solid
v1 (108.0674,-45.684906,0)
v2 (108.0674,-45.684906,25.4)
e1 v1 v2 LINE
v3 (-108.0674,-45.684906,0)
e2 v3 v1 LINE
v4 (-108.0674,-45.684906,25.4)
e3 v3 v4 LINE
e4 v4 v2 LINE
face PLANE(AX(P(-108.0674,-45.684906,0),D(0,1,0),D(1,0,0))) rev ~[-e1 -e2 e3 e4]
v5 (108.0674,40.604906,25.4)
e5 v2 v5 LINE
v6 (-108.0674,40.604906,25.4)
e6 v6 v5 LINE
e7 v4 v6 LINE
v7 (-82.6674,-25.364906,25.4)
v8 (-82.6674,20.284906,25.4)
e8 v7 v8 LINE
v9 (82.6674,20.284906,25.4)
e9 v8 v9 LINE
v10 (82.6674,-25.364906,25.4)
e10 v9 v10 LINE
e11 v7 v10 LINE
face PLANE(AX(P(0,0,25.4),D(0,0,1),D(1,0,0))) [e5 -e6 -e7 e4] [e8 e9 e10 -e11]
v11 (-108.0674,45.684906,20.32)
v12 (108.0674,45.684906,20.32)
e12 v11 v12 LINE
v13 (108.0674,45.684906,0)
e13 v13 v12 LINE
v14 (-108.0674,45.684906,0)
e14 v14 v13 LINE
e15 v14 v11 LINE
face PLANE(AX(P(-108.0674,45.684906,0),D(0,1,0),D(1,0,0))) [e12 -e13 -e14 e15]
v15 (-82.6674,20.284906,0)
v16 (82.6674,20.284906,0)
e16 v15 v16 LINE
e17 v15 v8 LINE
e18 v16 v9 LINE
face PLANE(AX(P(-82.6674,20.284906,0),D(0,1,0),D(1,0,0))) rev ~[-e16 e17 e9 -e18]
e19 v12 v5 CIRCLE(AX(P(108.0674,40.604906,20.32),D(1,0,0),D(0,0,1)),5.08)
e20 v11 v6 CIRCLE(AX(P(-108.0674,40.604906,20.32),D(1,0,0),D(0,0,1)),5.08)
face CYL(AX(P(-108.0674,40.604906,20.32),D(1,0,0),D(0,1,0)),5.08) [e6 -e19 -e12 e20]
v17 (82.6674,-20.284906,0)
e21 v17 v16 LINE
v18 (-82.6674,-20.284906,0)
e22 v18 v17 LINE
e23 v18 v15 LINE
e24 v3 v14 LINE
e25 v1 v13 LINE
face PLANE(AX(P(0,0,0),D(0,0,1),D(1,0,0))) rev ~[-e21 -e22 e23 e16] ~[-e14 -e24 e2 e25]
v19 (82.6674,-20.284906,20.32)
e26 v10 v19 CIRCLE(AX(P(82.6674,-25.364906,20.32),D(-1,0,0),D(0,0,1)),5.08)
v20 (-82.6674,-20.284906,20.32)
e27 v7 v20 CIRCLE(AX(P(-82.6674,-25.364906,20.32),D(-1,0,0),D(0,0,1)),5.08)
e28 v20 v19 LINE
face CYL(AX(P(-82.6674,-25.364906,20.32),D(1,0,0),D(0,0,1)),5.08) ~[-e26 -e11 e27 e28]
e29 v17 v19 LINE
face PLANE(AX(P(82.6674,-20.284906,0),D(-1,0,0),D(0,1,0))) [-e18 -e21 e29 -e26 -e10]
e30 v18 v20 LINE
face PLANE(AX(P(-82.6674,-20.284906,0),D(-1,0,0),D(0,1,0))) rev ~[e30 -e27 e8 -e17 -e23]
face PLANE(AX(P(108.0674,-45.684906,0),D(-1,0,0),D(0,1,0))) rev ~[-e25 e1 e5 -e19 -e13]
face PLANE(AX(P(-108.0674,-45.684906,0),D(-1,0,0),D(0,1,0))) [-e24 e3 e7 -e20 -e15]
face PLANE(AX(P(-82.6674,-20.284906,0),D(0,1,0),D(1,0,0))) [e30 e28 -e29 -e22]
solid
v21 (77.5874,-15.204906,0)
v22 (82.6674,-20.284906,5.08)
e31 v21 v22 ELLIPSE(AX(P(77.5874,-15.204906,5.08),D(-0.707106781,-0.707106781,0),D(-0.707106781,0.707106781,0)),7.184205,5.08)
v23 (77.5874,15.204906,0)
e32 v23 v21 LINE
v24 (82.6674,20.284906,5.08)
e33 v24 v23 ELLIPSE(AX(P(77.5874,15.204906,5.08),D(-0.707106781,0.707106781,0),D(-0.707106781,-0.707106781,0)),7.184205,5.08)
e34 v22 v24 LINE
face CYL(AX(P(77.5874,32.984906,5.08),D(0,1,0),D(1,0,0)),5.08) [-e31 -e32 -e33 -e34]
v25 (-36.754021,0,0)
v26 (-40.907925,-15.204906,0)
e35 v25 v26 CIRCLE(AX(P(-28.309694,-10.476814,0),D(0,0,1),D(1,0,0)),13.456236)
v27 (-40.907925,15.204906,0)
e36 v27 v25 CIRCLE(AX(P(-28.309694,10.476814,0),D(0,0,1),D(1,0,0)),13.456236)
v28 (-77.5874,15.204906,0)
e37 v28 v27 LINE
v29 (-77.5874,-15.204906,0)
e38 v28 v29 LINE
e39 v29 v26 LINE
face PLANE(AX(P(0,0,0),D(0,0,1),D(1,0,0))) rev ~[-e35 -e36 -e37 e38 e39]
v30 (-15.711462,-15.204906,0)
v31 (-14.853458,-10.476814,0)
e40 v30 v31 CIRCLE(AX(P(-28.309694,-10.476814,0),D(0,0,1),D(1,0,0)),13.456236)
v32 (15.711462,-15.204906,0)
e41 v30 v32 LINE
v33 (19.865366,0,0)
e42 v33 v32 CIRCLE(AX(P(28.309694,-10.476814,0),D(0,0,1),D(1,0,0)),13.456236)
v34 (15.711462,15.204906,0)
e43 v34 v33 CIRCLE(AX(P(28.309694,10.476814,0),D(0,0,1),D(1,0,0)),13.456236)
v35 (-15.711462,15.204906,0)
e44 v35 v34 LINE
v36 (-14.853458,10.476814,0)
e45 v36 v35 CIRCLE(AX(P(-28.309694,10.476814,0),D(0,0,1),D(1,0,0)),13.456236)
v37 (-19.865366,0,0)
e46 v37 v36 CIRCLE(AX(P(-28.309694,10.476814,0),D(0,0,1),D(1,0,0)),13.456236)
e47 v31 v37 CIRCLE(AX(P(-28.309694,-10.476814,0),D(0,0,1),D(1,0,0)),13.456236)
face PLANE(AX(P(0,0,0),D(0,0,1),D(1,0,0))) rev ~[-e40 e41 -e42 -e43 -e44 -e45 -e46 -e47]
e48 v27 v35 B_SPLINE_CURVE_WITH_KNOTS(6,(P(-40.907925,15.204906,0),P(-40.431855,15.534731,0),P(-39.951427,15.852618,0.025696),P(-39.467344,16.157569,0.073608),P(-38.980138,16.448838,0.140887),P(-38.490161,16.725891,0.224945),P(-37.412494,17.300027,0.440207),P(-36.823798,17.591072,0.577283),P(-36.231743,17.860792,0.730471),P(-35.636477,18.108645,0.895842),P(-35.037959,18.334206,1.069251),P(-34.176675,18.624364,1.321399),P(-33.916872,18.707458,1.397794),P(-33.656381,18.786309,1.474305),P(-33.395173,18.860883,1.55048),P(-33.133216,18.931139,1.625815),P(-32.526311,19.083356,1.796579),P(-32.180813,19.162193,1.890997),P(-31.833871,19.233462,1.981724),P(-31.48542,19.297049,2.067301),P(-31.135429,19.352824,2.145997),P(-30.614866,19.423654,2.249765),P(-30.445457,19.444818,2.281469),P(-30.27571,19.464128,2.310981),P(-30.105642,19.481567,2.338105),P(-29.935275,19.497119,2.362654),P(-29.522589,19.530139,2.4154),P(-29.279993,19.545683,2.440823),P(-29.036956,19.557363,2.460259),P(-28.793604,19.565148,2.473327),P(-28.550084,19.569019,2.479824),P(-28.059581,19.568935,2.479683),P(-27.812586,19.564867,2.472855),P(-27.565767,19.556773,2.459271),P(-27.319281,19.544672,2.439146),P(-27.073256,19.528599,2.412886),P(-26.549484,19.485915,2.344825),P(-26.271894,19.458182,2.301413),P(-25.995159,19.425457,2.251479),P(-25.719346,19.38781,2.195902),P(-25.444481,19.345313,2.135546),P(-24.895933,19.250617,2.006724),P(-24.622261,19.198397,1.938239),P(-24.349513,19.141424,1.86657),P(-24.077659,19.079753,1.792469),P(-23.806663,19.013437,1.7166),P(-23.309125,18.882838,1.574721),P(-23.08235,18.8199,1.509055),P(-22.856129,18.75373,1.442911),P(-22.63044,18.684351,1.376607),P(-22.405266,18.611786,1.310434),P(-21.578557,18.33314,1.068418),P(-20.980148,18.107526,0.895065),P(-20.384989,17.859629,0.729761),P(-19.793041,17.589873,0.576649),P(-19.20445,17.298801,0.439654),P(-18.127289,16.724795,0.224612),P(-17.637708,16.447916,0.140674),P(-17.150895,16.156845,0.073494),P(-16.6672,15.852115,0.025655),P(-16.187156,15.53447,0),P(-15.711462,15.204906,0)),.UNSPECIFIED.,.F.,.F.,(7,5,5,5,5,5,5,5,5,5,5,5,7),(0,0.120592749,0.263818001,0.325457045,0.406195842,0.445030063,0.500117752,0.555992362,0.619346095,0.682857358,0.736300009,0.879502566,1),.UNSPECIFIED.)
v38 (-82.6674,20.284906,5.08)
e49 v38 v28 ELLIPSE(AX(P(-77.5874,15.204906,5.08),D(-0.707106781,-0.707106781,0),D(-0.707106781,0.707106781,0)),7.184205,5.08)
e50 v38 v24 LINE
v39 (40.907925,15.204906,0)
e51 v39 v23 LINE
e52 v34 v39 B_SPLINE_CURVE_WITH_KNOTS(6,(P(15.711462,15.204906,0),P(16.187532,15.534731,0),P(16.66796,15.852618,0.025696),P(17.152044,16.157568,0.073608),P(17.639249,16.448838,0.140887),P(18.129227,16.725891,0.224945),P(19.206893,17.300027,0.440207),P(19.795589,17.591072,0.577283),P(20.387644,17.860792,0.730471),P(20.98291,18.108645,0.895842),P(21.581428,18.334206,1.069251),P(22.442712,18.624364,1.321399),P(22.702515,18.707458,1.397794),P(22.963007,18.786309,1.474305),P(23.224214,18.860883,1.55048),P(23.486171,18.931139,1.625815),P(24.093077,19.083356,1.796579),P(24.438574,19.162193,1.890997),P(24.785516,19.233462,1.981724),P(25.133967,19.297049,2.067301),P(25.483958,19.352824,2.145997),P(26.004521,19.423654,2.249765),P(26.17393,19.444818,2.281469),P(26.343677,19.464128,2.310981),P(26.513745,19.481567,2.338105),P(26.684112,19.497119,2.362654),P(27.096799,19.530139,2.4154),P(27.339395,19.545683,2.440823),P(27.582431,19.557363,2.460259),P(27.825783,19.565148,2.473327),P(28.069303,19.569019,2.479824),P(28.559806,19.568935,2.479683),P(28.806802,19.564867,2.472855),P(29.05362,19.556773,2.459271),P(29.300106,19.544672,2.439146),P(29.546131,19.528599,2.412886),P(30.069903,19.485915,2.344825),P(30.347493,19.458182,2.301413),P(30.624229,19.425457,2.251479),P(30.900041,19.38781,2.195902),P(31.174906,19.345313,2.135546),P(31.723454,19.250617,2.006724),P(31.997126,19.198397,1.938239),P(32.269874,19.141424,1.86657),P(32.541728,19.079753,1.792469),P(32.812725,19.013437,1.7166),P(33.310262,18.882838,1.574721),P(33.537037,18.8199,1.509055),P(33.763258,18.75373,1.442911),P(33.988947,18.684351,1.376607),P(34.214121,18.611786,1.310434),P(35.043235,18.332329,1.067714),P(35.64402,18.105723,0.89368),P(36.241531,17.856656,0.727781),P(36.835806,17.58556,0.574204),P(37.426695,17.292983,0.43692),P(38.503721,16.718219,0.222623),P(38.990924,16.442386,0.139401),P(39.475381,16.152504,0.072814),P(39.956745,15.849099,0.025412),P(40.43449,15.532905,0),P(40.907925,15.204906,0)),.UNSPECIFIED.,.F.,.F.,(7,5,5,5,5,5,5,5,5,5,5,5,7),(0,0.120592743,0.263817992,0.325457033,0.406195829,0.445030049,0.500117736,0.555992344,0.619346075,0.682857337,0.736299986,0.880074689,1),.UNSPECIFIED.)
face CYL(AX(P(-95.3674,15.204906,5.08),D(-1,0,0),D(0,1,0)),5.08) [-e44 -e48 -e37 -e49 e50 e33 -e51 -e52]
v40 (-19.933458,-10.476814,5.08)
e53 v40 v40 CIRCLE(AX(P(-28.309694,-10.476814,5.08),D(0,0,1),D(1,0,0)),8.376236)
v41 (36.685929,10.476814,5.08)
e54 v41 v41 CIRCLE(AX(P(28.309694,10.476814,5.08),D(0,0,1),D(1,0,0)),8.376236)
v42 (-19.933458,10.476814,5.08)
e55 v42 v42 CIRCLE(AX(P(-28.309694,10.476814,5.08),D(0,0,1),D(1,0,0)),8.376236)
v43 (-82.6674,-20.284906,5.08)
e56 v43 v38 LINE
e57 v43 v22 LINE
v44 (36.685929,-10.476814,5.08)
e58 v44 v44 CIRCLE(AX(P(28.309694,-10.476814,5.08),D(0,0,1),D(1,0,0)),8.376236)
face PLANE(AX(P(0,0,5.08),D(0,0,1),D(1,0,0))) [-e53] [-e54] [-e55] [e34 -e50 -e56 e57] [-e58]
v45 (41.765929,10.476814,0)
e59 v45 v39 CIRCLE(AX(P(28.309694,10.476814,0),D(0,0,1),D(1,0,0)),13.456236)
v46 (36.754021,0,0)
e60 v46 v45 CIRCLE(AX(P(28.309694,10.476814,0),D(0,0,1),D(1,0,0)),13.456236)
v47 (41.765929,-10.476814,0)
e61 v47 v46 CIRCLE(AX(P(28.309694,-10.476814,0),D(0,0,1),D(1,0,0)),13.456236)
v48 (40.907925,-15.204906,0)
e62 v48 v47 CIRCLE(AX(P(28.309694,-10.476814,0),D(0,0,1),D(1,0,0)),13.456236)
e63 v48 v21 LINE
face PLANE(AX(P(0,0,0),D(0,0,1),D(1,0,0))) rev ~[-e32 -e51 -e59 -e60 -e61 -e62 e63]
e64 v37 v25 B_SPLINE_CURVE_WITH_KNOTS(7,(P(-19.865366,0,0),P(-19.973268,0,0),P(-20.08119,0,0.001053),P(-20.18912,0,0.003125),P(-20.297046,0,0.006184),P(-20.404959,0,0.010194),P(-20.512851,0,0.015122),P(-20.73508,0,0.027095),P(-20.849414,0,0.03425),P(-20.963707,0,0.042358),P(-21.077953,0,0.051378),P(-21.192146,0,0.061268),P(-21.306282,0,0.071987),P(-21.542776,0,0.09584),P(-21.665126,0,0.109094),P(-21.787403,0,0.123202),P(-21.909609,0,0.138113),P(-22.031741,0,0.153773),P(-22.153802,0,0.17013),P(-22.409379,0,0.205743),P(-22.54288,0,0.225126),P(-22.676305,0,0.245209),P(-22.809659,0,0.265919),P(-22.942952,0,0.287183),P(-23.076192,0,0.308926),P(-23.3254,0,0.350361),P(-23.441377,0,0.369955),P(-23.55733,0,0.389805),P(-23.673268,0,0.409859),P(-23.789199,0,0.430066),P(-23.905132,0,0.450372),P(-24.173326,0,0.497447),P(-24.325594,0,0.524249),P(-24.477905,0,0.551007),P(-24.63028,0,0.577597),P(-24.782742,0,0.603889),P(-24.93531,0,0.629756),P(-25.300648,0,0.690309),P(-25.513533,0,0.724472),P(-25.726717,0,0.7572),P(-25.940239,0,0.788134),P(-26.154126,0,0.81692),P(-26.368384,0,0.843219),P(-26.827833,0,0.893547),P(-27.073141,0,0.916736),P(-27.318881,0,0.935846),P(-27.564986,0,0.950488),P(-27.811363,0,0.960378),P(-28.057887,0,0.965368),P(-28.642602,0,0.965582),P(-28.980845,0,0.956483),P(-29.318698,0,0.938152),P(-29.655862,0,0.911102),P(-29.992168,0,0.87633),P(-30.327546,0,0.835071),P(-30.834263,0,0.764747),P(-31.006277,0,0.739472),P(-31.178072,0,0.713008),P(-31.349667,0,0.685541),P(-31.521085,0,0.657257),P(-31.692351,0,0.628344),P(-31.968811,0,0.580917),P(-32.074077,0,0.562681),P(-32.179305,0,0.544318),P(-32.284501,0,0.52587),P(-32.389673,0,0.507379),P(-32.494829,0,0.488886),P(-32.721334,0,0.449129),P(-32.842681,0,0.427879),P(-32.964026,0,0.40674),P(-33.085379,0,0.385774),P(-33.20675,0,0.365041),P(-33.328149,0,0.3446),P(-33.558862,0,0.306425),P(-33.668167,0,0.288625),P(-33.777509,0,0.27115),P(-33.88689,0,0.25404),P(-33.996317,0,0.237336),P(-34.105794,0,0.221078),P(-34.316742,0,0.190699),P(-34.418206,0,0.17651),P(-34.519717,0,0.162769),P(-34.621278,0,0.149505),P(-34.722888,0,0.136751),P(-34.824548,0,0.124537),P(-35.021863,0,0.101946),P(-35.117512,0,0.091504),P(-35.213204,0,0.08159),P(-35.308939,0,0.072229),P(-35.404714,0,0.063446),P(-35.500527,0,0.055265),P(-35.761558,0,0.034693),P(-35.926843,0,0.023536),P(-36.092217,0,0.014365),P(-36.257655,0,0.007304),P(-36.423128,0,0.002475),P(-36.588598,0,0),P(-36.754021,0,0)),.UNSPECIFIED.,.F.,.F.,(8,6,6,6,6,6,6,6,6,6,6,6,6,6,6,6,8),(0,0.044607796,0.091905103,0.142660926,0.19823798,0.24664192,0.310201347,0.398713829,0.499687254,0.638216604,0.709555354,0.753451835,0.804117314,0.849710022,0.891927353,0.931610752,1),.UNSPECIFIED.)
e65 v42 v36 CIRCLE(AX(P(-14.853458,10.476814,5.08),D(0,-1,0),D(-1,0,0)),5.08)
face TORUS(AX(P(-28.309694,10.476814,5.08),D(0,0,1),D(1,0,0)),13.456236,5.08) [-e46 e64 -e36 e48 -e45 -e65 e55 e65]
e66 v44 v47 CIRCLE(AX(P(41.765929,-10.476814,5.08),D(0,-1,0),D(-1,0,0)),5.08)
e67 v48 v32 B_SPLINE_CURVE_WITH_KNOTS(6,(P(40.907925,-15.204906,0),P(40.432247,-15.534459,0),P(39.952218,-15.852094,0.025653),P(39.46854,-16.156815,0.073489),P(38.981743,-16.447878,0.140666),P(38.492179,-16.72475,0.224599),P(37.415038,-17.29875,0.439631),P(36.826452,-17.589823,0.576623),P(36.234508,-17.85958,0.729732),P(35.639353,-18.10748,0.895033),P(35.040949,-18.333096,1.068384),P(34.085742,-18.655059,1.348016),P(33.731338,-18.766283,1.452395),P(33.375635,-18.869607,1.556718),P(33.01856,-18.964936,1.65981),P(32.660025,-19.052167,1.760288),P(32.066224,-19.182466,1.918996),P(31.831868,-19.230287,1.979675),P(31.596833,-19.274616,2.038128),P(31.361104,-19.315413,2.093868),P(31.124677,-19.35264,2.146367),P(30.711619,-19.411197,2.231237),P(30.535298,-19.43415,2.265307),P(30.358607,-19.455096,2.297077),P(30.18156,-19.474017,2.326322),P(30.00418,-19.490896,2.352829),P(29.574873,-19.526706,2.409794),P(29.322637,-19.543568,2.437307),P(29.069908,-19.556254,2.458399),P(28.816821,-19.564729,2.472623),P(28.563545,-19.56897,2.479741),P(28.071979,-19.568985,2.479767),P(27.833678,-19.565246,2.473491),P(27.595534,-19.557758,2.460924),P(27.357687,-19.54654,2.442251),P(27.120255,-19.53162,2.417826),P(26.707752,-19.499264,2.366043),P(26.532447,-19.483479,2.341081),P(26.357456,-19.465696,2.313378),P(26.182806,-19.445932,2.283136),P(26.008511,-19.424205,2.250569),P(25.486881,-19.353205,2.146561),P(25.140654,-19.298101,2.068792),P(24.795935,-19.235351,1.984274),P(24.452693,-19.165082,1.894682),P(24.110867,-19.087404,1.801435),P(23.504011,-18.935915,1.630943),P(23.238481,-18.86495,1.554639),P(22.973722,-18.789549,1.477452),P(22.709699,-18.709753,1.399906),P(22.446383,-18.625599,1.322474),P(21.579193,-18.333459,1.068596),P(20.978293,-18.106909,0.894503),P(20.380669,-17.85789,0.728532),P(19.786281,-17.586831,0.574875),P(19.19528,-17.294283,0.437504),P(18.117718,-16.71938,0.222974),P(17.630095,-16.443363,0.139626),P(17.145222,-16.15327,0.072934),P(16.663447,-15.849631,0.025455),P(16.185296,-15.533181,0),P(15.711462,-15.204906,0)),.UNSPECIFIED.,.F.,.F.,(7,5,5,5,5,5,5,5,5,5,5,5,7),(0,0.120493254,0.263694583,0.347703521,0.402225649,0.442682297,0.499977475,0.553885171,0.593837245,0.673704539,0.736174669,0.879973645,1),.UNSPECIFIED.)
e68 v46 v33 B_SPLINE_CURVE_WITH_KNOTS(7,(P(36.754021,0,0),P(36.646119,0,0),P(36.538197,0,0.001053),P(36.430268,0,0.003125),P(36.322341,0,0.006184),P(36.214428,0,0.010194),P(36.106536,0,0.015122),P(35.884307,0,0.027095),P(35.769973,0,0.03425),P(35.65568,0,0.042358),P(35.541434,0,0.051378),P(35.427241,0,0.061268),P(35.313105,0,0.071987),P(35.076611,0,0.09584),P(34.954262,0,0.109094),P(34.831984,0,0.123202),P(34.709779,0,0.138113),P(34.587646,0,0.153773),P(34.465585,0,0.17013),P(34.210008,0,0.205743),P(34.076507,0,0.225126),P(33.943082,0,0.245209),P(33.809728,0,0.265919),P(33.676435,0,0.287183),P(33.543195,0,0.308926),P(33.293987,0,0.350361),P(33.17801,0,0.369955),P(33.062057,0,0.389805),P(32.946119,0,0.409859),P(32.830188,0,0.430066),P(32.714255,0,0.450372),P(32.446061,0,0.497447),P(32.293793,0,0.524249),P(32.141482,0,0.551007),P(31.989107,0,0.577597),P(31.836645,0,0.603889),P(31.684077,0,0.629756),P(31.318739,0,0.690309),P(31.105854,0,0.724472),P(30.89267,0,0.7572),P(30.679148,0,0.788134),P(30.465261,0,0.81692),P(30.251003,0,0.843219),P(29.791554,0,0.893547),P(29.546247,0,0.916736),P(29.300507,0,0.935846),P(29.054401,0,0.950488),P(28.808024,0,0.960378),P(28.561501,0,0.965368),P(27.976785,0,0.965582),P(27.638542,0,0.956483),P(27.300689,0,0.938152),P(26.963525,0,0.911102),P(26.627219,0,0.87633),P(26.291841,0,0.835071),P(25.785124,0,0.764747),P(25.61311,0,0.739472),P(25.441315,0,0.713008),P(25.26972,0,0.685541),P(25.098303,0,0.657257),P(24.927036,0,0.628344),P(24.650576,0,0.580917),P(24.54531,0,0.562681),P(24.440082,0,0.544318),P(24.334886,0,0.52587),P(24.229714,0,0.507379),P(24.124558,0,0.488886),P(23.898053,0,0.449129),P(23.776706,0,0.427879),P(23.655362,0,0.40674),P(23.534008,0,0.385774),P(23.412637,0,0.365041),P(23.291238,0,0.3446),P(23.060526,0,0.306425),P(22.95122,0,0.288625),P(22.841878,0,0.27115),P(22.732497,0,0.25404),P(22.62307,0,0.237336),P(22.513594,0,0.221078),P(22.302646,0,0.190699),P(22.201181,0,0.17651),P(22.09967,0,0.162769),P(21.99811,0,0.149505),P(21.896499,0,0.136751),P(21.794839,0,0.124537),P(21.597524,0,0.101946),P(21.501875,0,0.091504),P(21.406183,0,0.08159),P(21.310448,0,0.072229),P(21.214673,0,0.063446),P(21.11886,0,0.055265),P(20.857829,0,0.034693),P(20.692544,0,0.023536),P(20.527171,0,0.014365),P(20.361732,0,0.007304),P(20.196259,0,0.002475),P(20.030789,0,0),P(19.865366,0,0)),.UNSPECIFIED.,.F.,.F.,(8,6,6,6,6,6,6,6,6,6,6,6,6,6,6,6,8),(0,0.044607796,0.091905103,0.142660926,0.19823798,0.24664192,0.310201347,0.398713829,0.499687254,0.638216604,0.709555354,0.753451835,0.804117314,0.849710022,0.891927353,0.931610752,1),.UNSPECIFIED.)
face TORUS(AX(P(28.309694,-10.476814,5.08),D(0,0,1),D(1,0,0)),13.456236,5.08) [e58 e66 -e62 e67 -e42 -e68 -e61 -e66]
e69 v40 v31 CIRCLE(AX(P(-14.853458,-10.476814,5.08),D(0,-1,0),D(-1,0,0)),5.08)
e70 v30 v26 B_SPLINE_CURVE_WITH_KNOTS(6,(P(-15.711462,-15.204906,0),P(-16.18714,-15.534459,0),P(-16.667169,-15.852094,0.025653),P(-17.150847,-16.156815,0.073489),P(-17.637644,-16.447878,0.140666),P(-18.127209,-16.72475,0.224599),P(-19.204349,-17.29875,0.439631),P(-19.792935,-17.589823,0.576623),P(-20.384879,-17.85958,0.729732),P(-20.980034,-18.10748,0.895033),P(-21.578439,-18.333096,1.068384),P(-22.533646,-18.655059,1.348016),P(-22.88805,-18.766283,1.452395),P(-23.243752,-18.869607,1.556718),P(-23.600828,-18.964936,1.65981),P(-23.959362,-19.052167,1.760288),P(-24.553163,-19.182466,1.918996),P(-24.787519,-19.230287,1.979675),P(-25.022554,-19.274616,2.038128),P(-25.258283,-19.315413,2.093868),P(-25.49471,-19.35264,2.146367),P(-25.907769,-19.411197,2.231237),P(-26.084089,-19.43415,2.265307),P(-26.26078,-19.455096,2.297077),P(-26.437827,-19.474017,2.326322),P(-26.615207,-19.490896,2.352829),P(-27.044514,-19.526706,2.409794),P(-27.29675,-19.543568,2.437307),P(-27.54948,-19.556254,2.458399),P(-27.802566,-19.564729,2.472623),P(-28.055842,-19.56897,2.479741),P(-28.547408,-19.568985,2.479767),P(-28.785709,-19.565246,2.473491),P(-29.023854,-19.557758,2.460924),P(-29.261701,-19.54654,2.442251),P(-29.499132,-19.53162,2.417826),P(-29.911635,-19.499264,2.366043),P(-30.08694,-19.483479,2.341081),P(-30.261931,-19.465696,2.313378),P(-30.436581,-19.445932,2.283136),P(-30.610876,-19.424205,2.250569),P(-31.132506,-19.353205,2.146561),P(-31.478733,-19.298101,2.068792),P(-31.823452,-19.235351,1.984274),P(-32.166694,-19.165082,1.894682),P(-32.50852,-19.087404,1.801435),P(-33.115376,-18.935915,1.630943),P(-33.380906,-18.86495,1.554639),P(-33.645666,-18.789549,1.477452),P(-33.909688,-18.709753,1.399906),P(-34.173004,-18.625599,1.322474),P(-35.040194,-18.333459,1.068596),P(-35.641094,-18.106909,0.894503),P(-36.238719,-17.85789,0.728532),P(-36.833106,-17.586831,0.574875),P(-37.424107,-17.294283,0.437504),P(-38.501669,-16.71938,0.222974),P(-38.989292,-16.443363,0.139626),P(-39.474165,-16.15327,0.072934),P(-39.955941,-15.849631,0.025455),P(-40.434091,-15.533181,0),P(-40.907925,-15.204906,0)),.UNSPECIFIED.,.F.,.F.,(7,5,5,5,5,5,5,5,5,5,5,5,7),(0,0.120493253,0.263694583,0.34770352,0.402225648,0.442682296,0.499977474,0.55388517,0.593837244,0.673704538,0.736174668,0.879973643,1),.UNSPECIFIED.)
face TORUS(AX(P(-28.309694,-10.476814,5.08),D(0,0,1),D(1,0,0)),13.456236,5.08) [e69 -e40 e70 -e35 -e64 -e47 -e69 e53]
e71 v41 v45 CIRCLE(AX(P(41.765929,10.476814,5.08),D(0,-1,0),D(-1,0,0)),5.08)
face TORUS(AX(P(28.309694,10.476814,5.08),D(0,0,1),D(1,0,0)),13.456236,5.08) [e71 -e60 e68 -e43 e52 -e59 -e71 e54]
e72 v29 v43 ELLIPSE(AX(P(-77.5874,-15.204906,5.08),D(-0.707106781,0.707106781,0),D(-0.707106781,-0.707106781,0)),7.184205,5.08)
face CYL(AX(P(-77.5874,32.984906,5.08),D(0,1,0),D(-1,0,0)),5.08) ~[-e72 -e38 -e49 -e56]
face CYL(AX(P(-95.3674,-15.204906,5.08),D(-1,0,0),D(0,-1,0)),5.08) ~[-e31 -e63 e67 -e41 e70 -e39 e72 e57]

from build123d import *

# Parameters (mm, degrees)
F0_W        = 216.1347998985
F0_H        = 91.3698120594
F0_W_2      = 165.3347998985
F0_H_2      = 40.5698120594
F1_DEPTH    = 25.4
F0_R        = 8.376235911
F2_DEPTH    = 5.08
F3_T1_DEPTH = 190.7347998985
F3_T3_DEPTH = 65.9698120594
F3_2_F1_R   = 5.08
F3_2_F2_R   = 5.08


# Not quite as in the source:
# - a fillet or chamfer that OpenCascade refuses, or shapes differently, is made with other operations: its cross-section is extruded or revolved along the edge and cut away or added


with BuildPart() as f1:
    # F0 (on Top) → F1 (new body)
    with BuildSketch(Plane.XY):
        Rectangle(F0_W, F0_H)
        Rectangle(F0_W_2, F0_H_2, mode=Mode.SUBTRACT)
    extrude(amount=F1_DEPTH)

    # F3#2: fillet of radius 5.08 on 2 edges, made by hand

    # F3_2_f1
    f3_2_f1_edges = [f1.edges().sort_by_distance(p)[0] for p in [
        (0, 45.6849060297, 25.4),
    ]]
    fillet(f3_2_f1_edges, radius=F3_2_F1_R)

    # F3_2_f2
    f3_2_f2_edges = [f1.edges().sort_by_distance(p)[0] for p in [
        (0, -20.2849060297, 25.4),
    ]]
    fillet(f3_2_f2_edges, radius=F3_2_F2_R)


with BuildPart() as f2:
    # F0 (on Top) → F2 (new body)
    with BuildSketch(Plane.XY):
        Rectangle(F0_W_2, F0_H_2)
        with Locations((-28.30969356, -10.4768136516)):
            Circle(F0_R, mode=Mode.SUBTRACT)
        with Locations((28.30969356, -10.4768136516)):
            Circle(F0_R, mode=Mode.SUBTRACT)
        with Locations((-28.30969356, 10.4768136516)):
            Circle(F0_R, mode=Mode.SUBTRACT)
        with Locations((28.30969356, 10.4768136516)):
            Circle(F0_R, mode=Mode.SUBTRACT)
    extrude(amount=F2_DEPTH)

    # F3: fillet of radius 5.08 on 8 edges, made by hand

    # F3_s2 → F3_t1 (cut)
    with BuildSketch(Plane.YZ.offset(-95.3673999493)):
        with BuildLine():
            ThreePointArc((-20.2849060297, 5.08), (-18.7970084781, 1.4878975516), (-15.2049060297, 0))
            Line((-15.2049060297, 0), (-20.2849060297, 0))
            Line((-20.2849060297, 0), (-20.2849060297, 5.08))
        make_face()
        with BuildLine():
            ThreePointArc((20.2849060297, 5.08), (18.7970084781, 1.4878975516), (15.2049060297, 0))
            Line((15.2049060297, 0), (20.2849060297, 0))
            Line((20.2849060297, 0), (20.2849060297, 5.08))
        make_face()
    extrude(amount=F3_T1_DEPTH, mode=Mode.SUBTRACT)

    # F3_s4 → F3_t3 (cut)
    with BuildSketch(Plane.XZ.offset(-32.9849060297)):
        with BuildLine():
            ThreePointArc((82.6673999493, 5.08), (81.1795023977, 1.4878975516), (77.5873999493, 0))
            Line((77.5873999493, 0), (82.6673999493, 0))
            Line((82.6673999493, 0), (82.6673999493, 5.08))
        make_face()
        with BuildLine():
            ThreePointArc((-82.6673999493, 5.08), (-81.1795023977, 1.4878975516), (-77.5873999493, 0))
            Line((-77.5873999493, 0), (-82.6673999493, 0))
            Line((-82.6673999493, 0), (-82.6673999493, 5.08))
        make_face()
    extrude(amount=F3_T3_DEPTH, mode=Mode.SUBTRACT)

    # F3_s5 → F3_t6 (revolve, cut)
    with BuildSketch(Plane.XZ.offset(10.4768136516)):
        with BuildLine():
            ThreePointArc((-19.933457649, 5.08), (-18.4455600975, 1.4878975516), (-14.853457649, 0))
            Line((-14.853457649, 0), (-19.933457649, 0))
            Line((-19.933457649, 0), (-19.933457649, 5.08))
        make_face()
    revolve(axis=Axis((-28.30969356, -10.4768136516, 0), (0, 0, 1)), mode=Mode.SUBTRACT)

    # F3_s7 → F3_t8 (revolve, cut)
    with BuildSketch(Plane.XZ.offset(10.4768136516)):
        with BuildLine():
            ThreePointArc((36.685929471, 5.08), (38.1738270226, 1.4878975516), (41.765929471, 0))
            Line((41.765929471, 0), (36.685929471, 0))
            Line((36.685929471, 0), (36.685929471, 5.08))
        make_face()
    revolve(axis=Axis((28.30969356, -10.4768136516, 0), (0, 0, 1)), mode=Mode.SUBTRACT)

    # F3_s9 → F3_t10 (revolve, cut)
    with BuildSketch(Plane.XZ.offset(-10.4768136516)):
        with BuildLine():
            ThreePointArc((-19.933457649, 5.08), (-18.4455600975, 1.4878975516), (-14.853457649, 0))
            Line((-14.853457649, 0), (-19.933457649, 0))
            Line((-19.933457649, 0), (-19.933457649, 5.08))
        make_face()
    revolve(axis=Axis((-28.30969356, 10.4768136516, 0), (0, 0, 1)), mode=Mode.SUBTRACT)

    # F3_s11 → F3_t12 (revolve, cut)
    with BuildSketch(Plane.XZ.offset(-10.4768136516)):
        with BuildLine():
            ThreePointArc((36.685929471, 5.08), (38.1738270226, 1.4878975516), (41.765929471, 0))
            Line((41.765929471, 0), (36.685929471, 0))
            Line((36.685929471, 0), (36.685929471, 5.08))
        make_face()
    revolve(axis=Axis((28.30969356, 10.4768136516, 0), (0, 0, 1)), mode=Mode.SUBTRACT)


solid = Compound([f1.part, f2.part])
